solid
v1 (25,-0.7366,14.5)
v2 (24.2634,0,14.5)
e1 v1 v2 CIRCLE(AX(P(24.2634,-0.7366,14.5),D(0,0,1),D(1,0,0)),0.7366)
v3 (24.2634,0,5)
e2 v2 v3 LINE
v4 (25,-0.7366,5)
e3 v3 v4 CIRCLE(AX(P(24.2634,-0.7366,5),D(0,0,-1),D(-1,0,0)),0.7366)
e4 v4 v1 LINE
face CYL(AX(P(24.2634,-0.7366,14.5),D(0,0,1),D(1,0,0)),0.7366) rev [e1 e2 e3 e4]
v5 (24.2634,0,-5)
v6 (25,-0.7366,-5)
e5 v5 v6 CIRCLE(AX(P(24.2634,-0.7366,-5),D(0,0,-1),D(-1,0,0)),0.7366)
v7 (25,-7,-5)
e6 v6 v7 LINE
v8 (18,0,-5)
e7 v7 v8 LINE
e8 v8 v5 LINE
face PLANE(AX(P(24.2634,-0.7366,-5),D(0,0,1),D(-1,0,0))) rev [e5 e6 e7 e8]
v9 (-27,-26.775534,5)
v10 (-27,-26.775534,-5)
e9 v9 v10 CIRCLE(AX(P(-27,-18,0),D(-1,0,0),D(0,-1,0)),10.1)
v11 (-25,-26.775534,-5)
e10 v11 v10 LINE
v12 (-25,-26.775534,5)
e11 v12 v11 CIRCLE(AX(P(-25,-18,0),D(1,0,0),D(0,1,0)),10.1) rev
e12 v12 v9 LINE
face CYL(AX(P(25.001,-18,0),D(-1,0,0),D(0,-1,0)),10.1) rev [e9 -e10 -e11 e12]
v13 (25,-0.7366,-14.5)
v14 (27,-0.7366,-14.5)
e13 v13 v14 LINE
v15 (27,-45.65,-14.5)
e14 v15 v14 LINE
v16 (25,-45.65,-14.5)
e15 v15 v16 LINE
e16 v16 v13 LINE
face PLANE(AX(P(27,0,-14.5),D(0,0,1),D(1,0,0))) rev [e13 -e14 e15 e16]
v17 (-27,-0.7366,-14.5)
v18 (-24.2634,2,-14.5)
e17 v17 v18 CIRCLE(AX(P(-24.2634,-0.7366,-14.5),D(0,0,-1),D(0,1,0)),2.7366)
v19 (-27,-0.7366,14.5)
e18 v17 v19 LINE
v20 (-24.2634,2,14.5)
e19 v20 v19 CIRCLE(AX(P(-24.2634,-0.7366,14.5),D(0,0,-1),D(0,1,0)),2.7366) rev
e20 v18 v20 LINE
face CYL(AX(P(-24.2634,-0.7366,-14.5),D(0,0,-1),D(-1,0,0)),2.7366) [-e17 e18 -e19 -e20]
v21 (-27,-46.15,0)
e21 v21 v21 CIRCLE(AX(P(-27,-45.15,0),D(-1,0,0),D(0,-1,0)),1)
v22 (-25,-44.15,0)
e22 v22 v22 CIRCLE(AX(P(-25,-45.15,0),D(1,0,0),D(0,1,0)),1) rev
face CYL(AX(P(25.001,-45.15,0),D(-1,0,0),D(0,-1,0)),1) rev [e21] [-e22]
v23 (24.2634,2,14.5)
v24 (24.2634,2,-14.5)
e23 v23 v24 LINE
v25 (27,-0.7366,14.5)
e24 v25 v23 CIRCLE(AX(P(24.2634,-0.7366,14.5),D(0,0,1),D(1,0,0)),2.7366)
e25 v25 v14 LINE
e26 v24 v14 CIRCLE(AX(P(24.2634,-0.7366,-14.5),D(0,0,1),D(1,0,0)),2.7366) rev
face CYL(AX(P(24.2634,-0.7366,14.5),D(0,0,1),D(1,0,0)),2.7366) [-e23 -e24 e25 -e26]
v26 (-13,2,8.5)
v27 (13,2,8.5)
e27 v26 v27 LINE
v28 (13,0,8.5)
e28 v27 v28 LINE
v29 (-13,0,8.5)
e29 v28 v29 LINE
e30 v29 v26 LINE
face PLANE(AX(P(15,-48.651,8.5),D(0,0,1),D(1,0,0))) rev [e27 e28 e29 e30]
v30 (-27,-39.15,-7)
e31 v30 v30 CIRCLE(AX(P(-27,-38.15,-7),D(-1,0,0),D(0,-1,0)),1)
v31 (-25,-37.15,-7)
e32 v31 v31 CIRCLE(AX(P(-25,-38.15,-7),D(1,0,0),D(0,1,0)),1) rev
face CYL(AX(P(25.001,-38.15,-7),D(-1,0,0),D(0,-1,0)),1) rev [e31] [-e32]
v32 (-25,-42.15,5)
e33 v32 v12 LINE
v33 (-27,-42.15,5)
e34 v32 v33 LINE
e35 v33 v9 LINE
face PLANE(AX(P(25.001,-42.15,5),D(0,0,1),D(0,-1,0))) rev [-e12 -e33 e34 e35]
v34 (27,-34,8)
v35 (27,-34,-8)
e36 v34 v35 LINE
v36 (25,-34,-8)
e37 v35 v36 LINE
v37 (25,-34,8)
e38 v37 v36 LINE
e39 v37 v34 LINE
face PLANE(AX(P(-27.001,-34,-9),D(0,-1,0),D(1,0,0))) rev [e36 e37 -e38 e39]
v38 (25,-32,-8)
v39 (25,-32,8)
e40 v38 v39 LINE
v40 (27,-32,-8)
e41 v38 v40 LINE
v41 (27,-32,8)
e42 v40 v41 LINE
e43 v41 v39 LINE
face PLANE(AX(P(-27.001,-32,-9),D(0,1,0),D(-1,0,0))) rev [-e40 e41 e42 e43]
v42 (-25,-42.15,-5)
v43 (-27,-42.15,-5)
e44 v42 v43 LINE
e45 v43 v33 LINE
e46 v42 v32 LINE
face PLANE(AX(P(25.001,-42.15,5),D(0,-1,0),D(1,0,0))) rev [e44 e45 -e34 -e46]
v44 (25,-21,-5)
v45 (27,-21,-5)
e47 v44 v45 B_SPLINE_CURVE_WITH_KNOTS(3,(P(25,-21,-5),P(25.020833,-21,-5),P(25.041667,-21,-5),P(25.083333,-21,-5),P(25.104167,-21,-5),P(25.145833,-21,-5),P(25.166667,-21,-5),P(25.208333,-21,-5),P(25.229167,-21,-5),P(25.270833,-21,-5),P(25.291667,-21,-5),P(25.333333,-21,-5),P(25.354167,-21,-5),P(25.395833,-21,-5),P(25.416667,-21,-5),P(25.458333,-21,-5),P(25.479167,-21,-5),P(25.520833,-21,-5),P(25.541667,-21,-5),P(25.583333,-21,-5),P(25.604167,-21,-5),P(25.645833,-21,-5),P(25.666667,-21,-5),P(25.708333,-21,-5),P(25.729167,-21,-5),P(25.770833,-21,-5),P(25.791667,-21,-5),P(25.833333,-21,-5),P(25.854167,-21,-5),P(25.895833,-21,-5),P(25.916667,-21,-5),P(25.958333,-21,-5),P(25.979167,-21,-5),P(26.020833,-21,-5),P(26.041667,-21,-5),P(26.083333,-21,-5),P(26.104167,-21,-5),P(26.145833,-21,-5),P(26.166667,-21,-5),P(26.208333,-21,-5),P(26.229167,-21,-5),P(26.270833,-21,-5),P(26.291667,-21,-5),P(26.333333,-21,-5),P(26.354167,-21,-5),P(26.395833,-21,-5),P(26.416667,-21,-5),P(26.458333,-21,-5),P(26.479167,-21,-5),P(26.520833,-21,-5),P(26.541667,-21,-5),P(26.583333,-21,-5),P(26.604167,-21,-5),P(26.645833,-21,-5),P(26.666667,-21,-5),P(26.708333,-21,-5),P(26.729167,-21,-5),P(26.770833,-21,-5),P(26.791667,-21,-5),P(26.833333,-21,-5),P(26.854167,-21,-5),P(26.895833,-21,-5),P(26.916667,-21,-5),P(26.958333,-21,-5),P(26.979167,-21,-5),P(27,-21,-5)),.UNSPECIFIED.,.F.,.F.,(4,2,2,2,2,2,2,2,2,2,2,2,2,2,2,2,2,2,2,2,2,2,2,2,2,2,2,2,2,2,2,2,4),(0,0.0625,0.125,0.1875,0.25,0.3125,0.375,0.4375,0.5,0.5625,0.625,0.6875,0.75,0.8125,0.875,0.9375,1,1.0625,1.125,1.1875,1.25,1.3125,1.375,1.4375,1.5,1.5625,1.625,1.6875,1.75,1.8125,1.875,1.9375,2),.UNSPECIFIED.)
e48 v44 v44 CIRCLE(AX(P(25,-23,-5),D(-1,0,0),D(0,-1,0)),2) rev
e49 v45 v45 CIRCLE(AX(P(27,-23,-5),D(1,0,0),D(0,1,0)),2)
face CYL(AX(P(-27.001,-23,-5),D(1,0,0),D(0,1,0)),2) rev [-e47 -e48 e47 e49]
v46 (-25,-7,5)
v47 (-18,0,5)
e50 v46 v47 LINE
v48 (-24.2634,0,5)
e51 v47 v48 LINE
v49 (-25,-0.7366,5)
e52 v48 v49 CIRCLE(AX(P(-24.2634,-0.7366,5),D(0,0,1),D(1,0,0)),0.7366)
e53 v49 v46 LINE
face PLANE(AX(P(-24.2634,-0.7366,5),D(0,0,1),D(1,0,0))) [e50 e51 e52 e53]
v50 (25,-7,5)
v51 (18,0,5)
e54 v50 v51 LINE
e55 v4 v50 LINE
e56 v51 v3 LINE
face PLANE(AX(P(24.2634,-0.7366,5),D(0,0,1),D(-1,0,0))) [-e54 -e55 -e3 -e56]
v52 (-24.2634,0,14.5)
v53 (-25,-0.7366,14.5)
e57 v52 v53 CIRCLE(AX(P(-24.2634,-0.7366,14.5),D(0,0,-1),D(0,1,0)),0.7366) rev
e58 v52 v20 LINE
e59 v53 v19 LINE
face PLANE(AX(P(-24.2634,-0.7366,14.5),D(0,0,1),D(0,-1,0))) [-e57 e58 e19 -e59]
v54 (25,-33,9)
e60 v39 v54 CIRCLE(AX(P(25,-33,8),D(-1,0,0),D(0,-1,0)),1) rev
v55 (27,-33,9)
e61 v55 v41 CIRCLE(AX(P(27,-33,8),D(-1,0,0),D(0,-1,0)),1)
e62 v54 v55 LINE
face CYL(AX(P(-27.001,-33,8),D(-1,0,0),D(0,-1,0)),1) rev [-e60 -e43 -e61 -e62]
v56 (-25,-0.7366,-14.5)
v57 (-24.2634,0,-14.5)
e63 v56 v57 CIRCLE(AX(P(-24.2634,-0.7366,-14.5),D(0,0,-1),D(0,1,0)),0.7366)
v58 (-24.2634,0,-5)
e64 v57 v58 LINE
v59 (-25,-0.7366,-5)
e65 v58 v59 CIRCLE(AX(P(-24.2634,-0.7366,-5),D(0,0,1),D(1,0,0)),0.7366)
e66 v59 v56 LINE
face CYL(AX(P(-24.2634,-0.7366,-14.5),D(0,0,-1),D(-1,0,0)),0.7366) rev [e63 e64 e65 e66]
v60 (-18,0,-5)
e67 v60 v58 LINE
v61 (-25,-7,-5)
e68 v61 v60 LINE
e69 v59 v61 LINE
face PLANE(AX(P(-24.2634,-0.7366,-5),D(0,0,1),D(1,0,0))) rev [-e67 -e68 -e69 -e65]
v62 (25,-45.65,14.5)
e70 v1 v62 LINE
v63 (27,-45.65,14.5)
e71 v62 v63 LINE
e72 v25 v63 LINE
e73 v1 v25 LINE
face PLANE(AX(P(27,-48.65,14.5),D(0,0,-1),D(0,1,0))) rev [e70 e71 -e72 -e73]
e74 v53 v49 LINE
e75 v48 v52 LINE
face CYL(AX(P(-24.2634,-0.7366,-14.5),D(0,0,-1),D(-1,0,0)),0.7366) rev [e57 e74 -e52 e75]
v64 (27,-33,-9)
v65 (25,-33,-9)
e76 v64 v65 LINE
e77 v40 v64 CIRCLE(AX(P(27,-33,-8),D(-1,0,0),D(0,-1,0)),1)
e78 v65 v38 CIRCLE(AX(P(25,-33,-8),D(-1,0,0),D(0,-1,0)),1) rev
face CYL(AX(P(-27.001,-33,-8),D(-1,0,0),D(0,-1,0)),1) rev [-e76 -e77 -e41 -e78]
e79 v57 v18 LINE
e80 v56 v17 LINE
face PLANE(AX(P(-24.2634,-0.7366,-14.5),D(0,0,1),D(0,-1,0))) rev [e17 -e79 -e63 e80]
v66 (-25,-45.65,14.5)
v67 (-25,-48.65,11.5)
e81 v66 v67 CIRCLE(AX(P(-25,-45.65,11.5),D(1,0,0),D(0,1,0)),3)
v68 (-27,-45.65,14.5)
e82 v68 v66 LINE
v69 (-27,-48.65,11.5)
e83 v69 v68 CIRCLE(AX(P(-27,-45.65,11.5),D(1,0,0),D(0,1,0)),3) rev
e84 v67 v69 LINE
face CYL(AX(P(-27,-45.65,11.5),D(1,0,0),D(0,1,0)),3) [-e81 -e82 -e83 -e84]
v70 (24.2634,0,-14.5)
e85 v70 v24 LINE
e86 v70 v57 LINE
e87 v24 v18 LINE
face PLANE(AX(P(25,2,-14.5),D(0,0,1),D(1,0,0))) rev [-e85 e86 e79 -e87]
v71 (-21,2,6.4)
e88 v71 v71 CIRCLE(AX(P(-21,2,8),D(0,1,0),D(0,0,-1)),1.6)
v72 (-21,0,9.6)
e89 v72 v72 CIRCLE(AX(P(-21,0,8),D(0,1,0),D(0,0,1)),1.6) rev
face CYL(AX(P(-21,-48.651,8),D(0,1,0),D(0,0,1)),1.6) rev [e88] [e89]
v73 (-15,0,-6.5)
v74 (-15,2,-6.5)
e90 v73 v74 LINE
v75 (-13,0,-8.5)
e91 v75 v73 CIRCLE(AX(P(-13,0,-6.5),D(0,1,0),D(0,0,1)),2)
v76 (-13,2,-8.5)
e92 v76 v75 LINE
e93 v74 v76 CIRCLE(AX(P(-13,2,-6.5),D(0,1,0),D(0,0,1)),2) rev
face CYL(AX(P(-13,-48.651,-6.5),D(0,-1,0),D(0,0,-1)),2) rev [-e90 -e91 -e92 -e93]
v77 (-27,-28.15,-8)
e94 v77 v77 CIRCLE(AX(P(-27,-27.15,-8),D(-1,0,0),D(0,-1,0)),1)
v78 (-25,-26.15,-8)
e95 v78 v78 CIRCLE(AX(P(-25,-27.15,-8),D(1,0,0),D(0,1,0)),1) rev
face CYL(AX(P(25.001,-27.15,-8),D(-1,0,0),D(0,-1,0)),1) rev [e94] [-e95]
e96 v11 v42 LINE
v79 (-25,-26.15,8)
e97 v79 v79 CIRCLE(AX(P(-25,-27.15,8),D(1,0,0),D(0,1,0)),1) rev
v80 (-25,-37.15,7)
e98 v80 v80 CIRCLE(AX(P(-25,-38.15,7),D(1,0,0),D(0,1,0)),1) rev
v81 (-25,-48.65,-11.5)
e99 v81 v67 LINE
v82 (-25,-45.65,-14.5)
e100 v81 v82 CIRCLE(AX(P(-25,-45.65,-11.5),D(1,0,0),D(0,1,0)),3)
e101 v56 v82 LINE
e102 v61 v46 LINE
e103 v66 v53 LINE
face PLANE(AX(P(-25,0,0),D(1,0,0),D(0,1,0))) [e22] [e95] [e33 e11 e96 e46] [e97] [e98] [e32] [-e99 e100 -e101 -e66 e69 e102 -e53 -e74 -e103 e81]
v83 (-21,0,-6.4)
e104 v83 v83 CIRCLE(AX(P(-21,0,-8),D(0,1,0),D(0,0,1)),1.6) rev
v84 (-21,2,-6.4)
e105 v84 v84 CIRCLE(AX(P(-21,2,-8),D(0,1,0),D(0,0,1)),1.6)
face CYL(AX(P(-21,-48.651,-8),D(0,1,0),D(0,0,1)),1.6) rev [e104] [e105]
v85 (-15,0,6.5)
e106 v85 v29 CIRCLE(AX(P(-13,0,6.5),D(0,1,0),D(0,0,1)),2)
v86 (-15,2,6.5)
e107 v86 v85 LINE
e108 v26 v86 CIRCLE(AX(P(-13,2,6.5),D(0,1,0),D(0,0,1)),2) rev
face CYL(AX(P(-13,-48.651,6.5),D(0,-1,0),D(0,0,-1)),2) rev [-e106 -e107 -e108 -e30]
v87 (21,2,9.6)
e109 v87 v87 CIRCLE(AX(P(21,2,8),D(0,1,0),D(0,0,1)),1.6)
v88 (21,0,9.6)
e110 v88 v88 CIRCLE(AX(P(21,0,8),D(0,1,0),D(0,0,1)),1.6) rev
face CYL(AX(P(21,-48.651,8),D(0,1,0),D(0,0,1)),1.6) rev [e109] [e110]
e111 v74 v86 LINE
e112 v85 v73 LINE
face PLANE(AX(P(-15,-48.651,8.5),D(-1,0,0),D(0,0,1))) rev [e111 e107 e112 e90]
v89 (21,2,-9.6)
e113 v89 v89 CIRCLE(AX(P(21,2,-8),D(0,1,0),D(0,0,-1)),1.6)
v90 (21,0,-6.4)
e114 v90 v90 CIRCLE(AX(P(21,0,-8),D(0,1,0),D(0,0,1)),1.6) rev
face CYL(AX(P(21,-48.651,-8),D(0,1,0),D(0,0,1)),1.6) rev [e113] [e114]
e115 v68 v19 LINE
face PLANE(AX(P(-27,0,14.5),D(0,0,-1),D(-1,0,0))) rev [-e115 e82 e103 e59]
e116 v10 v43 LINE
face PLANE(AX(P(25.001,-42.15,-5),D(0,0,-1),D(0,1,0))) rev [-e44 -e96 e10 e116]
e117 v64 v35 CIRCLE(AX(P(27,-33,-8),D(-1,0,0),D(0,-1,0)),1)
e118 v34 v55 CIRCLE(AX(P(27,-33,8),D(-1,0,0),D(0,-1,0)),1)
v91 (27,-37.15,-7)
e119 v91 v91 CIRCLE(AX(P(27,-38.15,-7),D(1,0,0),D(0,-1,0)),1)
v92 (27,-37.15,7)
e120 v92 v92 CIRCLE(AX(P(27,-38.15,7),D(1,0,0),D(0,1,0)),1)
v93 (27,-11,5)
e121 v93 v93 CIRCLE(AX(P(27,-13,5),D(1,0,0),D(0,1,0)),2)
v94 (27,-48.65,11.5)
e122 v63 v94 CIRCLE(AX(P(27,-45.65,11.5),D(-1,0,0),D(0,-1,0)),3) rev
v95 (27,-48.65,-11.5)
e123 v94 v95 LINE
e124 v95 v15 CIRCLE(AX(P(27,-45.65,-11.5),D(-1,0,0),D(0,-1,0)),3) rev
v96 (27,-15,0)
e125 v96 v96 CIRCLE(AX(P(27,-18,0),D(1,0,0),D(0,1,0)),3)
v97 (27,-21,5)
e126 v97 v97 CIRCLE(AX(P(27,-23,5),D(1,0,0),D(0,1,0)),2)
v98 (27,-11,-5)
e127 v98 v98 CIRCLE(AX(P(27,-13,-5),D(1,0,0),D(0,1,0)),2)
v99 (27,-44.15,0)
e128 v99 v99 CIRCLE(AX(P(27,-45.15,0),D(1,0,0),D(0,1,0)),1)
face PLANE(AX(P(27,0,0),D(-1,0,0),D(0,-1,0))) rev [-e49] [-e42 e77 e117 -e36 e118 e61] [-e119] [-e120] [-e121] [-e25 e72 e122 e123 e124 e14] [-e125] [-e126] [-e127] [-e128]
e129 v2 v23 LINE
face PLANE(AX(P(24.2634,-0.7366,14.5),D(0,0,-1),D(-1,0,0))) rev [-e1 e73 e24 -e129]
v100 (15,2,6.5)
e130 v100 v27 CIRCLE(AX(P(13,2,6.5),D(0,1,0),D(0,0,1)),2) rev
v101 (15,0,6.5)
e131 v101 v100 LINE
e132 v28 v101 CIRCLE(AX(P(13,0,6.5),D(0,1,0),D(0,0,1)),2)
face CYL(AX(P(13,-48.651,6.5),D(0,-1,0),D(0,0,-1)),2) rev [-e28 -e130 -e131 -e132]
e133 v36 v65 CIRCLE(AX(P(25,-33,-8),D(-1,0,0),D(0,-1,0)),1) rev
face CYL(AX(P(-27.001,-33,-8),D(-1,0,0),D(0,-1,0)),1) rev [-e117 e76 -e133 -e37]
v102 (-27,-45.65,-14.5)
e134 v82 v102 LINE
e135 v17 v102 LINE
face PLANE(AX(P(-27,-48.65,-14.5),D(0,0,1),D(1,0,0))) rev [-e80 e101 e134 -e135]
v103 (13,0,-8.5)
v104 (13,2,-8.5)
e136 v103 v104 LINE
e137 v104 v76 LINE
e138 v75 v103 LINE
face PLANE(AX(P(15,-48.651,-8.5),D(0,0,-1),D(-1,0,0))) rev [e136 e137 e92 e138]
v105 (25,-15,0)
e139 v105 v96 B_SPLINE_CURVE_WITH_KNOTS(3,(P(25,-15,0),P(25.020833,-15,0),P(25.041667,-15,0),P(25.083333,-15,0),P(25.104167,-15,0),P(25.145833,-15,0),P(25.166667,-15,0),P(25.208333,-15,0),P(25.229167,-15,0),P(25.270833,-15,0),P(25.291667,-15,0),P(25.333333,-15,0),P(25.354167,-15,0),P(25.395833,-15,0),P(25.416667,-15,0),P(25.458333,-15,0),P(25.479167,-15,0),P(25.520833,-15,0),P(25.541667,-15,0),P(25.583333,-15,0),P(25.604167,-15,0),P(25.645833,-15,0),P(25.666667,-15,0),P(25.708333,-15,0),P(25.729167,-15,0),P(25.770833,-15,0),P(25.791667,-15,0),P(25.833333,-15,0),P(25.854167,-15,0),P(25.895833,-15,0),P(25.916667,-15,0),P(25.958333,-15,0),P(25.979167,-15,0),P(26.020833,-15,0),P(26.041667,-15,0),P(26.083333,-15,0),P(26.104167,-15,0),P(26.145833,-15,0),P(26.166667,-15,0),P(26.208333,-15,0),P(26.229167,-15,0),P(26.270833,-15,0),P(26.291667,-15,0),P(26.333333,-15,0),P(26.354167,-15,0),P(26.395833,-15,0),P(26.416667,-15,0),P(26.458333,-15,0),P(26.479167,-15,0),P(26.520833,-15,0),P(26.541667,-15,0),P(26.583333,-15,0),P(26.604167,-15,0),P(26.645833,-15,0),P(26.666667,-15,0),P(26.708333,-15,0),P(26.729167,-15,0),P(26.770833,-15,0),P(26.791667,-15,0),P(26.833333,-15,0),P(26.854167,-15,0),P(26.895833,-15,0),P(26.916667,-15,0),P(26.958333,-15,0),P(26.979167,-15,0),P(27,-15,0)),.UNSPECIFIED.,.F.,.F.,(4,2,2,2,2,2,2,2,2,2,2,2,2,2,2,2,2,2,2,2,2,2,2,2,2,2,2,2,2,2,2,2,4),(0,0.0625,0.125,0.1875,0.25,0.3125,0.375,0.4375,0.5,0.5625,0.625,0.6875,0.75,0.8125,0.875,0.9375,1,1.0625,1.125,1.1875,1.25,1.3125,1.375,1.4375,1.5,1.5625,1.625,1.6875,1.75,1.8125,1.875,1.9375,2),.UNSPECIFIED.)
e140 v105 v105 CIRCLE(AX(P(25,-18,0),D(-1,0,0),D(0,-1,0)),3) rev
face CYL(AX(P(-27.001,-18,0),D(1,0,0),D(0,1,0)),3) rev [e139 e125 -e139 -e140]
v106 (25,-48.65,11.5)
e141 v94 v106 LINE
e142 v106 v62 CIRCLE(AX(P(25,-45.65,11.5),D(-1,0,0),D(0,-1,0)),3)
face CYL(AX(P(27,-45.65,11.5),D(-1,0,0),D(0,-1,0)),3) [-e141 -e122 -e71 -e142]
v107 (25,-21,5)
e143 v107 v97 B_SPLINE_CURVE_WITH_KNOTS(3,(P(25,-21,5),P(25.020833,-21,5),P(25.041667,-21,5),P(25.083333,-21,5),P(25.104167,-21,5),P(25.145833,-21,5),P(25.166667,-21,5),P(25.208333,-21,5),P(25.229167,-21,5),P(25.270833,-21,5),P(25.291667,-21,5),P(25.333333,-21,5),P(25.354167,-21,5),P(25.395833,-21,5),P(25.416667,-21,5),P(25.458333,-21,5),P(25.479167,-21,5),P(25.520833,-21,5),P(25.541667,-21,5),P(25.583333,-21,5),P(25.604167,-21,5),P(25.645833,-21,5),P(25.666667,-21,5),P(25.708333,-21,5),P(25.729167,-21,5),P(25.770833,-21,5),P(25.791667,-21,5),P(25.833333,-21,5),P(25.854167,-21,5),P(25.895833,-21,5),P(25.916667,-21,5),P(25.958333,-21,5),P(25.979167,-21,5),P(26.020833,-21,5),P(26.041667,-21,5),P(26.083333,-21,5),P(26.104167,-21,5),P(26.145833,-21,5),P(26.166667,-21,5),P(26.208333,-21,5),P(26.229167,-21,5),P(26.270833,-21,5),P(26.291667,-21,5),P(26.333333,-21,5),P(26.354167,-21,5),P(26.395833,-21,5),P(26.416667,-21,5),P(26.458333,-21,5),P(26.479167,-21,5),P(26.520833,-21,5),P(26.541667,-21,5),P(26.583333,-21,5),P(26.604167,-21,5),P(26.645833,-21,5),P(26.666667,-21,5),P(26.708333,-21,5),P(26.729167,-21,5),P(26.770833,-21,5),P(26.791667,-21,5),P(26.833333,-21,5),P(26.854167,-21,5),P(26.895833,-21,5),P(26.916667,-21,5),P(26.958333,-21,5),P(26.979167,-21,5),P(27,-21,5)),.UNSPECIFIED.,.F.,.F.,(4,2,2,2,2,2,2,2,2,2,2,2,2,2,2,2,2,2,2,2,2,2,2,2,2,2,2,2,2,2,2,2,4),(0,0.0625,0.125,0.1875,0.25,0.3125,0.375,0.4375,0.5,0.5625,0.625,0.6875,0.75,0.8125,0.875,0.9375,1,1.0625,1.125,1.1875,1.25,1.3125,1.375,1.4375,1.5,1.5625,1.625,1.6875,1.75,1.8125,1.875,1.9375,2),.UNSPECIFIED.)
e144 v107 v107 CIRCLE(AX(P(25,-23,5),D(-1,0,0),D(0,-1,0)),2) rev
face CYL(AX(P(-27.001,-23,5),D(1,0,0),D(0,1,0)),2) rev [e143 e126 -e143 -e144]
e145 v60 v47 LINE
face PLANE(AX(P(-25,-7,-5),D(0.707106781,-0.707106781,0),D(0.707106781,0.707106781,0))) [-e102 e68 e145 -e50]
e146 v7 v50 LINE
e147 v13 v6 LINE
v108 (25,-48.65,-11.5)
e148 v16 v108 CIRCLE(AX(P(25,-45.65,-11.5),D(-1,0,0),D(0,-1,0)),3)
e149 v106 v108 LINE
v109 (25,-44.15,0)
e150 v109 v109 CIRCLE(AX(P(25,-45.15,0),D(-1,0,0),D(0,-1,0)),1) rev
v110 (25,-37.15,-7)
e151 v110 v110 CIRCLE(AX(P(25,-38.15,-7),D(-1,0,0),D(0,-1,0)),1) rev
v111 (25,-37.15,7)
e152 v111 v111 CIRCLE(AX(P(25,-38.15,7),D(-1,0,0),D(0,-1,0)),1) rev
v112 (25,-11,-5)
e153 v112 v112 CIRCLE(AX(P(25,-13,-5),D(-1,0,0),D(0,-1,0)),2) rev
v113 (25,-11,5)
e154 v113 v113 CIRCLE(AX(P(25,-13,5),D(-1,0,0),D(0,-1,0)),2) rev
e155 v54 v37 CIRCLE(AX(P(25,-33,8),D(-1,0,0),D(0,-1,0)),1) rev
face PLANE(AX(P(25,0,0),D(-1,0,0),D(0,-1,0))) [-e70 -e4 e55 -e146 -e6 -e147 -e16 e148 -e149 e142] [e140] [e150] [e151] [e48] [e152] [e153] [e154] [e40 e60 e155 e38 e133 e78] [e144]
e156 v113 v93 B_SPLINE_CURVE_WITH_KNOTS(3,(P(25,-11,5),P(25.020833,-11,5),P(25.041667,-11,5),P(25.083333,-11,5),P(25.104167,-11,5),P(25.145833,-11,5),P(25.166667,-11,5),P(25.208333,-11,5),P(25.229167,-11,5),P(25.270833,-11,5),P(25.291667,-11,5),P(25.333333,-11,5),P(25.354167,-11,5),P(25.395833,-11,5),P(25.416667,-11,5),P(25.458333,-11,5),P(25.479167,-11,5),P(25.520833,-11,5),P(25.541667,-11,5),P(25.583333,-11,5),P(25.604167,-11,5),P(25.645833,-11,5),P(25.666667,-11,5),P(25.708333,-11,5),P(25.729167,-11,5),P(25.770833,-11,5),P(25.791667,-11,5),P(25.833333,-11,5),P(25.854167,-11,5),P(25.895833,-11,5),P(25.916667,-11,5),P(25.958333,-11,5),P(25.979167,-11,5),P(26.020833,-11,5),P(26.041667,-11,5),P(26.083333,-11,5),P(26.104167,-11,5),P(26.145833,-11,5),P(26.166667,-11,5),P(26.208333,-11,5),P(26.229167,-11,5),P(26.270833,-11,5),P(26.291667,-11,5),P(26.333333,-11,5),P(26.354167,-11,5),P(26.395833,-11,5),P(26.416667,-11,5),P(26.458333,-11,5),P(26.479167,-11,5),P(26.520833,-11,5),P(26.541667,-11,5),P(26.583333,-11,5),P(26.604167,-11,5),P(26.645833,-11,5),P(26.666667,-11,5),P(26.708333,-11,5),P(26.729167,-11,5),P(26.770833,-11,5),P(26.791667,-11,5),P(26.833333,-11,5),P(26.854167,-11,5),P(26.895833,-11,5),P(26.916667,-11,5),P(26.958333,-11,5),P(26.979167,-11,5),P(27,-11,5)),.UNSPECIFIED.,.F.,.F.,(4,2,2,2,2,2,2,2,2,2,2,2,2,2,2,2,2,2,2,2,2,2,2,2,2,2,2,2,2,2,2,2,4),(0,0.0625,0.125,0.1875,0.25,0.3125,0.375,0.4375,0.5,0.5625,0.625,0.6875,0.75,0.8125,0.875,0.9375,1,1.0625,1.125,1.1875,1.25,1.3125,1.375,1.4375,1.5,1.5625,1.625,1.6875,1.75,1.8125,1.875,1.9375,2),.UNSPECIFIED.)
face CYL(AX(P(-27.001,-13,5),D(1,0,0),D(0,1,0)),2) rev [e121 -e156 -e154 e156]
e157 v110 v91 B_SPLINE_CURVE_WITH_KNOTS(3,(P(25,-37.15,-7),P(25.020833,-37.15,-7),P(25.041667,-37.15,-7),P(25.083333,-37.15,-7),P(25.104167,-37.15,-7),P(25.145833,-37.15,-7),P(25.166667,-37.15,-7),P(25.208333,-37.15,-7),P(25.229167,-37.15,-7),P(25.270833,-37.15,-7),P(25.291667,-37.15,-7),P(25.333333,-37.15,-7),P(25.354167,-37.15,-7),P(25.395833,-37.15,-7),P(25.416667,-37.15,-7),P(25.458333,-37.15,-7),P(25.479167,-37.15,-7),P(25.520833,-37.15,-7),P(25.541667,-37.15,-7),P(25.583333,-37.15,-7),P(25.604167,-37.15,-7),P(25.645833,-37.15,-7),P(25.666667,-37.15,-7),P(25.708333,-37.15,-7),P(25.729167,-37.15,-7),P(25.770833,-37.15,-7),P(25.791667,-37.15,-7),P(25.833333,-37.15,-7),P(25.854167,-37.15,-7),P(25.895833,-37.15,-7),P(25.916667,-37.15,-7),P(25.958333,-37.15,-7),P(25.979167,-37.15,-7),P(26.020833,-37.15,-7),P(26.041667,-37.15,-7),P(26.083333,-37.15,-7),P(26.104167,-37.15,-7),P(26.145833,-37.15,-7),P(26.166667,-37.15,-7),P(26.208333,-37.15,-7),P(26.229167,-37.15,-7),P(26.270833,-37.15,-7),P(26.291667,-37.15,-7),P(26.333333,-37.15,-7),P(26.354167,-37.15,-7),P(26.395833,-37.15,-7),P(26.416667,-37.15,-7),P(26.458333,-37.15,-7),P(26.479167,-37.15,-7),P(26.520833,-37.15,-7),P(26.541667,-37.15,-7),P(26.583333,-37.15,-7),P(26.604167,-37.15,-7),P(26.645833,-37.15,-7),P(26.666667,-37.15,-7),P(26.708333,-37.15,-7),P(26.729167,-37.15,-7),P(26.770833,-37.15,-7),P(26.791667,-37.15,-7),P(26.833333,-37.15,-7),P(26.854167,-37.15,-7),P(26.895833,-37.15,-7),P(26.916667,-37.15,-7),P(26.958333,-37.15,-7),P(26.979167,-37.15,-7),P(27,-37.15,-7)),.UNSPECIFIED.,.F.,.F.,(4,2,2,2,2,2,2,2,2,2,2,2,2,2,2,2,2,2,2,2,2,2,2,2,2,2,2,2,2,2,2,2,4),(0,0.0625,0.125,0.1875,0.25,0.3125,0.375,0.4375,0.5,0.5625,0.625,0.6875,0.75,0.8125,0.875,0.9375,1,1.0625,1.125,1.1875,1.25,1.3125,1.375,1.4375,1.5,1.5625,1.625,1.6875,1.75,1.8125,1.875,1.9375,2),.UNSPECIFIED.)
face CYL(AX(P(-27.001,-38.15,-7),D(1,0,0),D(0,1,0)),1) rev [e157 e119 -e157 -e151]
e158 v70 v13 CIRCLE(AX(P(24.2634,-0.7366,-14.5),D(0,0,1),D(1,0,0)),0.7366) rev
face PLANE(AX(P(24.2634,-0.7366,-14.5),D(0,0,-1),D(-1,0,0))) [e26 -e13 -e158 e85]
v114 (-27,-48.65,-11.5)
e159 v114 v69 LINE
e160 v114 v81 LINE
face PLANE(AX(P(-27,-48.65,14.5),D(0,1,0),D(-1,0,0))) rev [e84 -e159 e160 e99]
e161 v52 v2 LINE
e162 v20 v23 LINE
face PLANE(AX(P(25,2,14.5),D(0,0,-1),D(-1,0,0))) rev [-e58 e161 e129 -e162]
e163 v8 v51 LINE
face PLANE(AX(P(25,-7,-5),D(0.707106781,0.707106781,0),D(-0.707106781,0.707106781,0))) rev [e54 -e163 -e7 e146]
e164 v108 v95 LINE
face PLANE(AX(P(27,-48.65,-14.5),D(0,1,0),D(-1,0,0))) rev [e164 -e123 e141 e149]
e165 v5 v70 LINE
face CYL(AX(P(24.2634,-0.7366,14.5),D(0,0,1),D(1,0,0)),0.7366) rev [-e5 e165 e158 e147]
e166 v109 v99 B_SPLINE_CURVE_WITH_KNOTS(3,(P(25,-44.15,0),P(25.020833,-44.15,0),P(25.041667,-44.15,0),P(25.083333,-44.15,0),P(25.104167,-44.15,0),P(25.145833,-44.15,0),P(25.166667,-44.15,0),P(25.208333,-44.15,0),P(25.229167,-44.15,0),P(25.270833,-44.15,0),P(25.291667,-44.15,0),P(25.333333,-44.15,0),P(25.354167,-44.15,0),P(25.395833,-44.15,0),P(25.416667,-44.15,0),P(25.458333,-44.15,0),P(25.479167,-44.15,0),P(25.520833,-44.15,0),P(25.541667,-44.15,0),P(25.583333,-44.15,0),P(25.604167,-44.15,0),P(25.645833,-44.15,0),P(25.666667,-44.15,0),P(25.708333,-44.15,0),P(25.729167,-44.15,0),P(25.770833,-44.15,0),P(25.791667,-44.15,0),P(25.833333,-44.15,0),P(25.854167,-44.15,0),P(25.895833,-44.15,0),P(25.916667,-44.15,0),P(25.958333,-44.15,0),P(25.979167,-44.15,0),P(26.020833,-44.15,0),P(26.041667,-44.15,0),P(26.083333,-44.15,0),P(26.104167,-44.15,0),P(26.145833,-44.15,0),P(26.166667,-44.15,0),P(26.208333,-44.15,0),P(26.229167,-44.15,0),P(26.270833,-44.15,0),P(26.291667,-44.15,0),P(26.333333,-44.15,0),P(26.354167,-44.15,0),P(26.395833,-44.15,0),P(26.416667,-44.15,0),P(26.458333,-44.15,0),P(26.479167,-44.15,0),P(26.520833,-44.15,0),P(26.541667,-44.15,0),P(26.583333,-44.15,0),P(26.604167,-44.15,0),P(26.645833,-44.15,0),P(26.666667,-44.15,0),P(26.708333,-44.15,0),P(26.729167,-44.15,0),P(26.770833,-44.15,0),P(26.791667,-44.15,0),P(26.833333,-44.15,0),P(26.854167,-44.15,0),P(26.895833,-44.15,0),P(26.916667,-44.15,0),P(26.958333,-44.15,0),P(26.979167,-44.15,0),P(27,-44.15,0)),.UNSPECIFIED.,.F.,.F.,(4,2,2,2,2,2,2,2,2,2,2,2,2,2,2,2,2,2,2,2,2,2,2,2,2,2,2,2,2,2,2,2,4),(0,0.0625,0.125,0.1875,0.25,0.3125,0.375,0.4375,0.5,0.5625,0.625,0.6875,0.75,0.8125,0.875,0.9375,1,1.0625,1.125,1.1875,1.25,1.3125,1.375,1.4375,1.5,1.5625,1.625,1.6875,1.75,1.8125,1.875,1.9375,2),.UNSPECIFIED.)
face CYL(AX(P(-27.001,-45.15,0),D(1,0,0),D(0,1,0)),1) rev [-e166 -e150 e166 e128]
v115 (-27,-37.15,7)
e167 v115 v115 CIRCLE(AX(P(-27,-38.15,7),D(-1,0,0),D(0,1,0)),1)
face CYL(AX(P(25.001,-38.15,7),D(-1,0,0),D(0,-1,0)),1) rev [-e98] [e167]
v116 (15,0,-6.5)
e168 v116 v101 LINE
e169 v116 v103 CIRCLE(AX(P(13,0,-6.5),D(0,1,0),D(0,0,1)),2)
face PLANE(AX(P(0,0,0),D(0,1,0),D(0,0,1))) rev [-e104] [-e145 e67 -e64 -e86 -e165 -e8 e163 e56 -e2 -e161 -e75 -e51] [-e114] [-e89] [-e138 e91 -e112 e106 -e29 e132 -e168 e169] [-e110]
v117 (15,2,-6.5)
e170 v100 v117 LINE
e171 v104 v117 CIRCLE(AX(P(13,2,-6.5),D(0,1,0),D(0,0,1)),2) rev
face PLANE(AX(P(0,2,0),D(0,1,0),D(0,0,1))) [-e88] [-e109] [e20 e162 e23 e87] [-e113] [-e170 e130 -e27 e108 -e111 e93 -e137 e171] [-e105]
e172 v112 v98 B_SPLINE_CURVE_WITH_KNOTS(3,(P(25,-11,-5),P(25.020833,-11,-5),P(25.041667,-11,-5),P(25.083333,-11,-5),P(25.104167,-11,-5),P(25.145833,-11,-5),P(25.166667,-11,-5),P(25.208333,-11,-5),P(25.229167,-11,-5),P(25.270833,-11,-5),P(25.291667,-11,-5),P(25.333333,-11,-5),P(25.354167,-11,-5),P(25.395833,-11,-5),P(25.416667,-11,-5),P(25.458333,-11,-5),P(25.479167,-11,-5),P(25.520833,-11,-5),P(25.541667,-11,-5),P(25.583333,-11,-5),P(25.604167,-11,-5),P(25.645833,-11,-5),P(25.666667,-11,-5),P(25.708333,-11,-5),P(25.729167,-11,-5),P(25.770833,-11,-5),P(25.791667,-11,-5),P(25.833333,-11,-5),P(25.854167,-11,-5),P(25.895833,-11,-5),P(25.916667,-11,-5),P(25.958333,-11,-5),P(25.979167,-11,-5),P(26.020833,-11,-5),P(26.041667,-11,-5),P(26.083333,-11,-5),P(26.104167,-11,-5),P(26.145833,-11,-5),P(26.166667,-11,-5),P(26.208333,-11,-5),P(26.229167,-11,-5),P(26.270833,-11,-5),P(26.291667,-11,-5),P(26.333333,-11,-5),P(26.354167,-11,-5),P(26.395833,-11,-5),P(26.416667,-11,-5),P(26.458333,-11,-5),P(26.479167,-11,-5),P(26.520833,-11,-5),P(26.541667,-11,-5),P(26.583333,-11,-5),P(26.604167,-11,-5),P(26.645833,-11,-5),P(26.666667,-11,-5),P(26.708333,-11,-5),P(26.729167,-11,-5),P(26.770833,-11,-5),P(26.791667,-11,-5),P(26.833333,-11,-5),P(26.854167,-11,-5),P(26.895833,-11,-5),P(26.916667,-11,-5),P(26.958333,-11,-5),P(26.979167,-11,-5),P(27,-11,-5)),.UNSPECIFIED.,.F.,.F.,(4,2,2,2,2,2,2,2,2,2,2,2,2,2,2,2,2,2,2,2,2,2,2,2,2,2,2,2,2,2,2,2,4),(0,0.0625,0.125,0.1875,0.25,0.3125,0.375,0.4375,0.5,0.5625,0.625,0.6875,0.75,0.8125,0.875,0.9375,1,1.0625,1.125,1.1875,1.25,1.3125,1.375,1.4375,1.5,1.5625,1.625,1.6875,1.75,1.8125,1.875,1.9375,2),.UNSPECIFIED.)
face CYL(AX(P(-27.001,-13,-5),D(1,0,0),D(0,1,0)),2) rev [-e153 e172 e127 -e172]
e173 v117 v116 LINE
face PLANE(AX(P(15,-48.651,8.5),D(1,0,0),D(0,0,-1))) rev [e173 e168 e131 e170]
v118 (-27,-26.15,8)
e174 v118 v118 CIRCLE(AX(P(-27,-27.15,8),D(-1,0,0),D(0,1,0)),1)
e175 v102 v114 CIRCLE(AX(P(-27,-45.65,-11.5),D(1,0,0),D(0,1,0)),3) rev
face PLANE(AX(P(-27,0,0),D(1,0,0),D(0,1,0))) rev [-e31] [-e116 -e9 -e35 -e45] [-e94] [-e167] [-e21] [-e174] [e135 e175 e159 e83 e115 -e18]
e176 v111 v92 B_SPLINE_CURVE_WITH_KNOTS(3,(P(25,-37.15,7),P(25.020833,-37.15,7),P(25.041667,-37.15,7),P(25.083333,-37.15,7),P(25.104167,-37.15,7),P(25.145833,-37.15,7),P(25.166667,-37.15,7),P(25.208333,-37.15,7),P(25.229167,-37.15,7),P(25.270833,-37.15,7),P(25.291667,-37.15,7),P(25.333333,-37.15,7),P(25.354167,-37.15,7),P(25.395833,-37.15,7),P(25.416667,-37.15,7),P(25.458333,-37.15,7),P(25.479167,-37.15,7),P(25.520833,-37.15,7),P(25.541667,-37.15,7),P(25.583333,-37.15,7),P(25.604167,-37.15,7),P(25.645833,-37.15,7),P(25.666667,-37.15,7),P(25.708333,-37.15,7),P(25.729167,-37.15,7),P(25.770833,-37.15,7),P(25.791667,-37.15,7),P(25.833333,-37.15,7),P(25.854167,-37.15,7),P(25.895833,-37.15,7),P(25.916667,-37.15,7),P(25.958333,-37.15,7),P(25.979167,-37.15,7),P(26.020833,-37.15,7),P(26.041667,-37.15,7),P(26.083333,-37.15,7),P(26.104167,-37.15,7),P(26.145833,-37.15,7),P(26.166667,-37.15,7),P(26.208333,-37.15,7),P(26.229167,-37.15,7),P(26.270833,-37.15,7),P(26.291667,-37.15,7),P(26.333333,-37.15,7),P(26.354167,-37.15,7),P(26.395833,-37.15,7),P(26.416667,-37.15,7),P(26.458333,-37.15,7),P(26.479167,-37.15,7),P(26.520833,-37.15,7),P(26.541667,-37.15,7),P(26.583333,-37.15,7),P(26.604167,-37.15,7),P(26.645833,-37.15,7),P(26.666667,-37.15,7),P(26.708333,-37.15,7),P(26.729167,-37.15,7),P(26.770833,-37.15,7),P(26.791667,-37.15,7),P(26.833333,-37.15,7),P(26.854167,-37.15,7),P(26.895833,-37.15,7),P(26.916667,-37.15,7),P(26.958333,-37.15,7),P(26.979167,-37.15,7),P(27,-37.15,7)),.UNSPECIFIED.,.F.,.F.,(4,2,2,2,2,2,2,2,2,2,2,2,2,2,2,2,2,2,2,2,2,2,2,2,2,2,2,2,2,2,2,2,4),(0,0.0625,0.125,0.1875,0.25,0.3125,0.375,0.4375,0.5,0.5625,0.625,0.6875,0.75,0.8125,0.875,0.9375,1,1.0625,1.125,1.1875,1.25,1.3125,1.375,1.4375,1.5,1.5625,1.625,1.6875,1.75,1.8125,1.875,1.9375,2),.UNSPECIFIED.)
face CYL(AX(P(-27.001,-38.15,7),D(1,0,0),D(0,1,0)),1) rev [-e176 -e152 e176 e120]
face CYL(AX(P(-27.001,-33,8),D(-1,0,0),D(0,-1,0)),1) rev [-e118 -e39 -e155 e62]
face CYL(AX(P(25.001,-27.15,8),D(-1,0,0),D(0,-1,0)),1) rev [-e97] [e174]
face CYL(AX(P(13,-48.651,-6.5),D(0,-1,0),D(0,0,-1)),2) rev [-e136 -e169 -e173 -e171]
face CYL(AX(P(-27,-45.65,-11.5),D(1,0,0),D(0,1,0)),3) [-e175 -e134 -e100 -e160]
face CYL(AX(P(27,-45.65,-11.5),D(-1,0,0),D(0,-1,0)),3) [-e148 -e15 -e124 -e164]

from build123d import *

# Parameters (mm, degrees)
SKETCH_1_W                       = 50
SKETCH_1_H                       = 29
SM_BASE_FLANGE_1_DEPTH           = 2
SM_EDGE_FLANGE_1_STRIP_W         = 9.4732
SM_EDGE_FLANGE_1_STRIP_H         = 2
SM_EDGE_FLANGE_1_STRIP_CUT_DEPTH = 29
SM_EDGE_FLANGE_1_DEPTH           = 29
CUT_EXTRUDE_1_REACH              = 74.671
SKETCH_9_R                       = 1
SM_EDGE_FLANGE_2_STRIP_W         = 9.4732
SM_EDGE_FLANGE_2_STRIP_H         = 2
SM_EDGE_FLANGE_2_STRIP_CUT_DEPTH = 29
SM_EDGE_FLANGE_2_DEPTH           = 29
CUT_EXTRUDE_2_REACH              = 76.115
SKETCH_13_R                      = 3
SKETCH_13_R_2                    = 2
SKETCH_13_R_3                    = 1
SKETCH_13_W                      = 18
SKETCH_13_H                      = 2
FILLET_1_R                       = 3
CUT_EXTRUDE_3_REACH              = 61.2
SKETCH_14_R                      = 1.6
SKETCH_14_W                      = 30
SKETCH_14_H                      = 17
FILLET_2_R                       = 2
EXTRUDE_1_DEPTH                  = 5
FILLET_3_R                       = 1


# Sheet-metal steps are written as plain solids
with BuildPart() as part:
    # Sketch 1 → 基体-法兰1 (new body)
    with BuildSketch(Plane(origin=(0, 0, 0), x_dir=(1, 0, 0), z_dir=(0, 1, 0))):
        Rectangle(SKETCH_1_W, SKETCH_1_H)
    extrude(amount=SM_BASE_FLANGE_1_DEPTH)

    # 边线-法兰1 strip (across the edge) → 边线-法兰1 strip cut (cut)
    with BuildSketch(Plane(origin=(-25, 0, 14.5), x_dir=(1, 0, 0), z_dir=(0, 0, -1))):
        with Locations((-4, -1)):
            Rectangle(SM_EDGE_FLANGE_1_STRIP_W, SM_EDGE_FLANGE_1_STRIP_H)
    extrude(amount=SM_EDGE_FLANGE_1_STRIP_CUT_DEPTH, mode=Mode.SUBTRACT)

    # 边线-法兰1 section (across the edge) → 边线-法兰1 (add)
    with BuildSketch(Plane(origin=(-25, 0, 14.5), x_dir=(1, 0, 0), z_dir=(0, 0, -1))):
        with BuildLine():
            Line((-2, 0.7366), (-2, 48.65))
            Line((-2, 48.65), (0, 48.65))
            Line((0, 48.65), (0, 0.7366))
            ThreePointArc((0, 0.7366), (0.215745145, 0.215745145), (0.7366, 0))
            Line((0.7366, 0), (0.7366, -2))
            ThreePointArc((0.7366, -2), (-1.198468417, -1.198468417), (-2, 0.7366))
        make_face()
    extrude(amount=SM_EDGE_FLANGE_1_DEPTH)

    # 草图9 → 切除-拉伸1 (cut, up to next)
    with BuildSketch(Plane.ZY.offset(27), mode=Mode.PRIVATE) as cut_extrude_1_sk1:
        with Locations(Location((-8, -27.15, 0), (0, 0, 270))):
            Circle(SKETCH_9_R)
    cut_extrude_1_tool1 = extrude(cut_extrude_1_sk1.sketch, amount=-CUT_EXTRUDE_1_REACH, mode=Mode.PRIVATE) & part.part
    # 草图9 → 切除-拉伸1 (cut, up to next)
    with BuildSketch(Plane.ZY.offset(27), mode=Mode.PRIVATE) as cut_extrude_1_sk2:
        with Locations(Location((-7, -38.15, 0), (0, 0, 270))):
            Circle(SKETCH_9_R)
    cut_extrude_1_tool2 = extrude(cut_extrude_1_sk2.sketch, amount=-CUT_EXTRUDE_1_REACH, mode=Mode.PRIVATE) & part.part
    # 草图9 → 切除-拉伸1 (cut, up to next)
    with BuildSketch(Plane.ZY.offset(27), mode=Mode.PRIVATE) as cut_extrude_1_sk3:
        with Locations(Location((0, -45.15, 0), (0, 0, 270))):
            Circle(SKETCH_9_R)
    cut_extrude_1_tool3 = extrude(cut_extrude_1_sk3.sketch, amount=-CUT_EXTRUDE_1_REACH, mode=Mode.PRIVATE) & part.part
    # 草图9 → 切除-拉伸1 (cut, up to next)
    with BuildSketch(Plane.ZY.offset(27), mode=Mode.PRIVATE) as cut_extrude_1_sk4:
        with Locations(Location((7, -38.15, 0), (0, 0, 90))):
            Circle(SKETCH_9_R)
    cut_extrude_1_tool4 = extrude(cut_extrude_1_sk4.sketch, amount=-CUT_EXTRUDE_1_REACH, mode=Mode.PRIVATE) & part.part
    # 草图9 → 切除-拉伸1 (cut, up to next)
    with BuildSketch(Plane.ZY.offset(27), mode=Mode.PRIVATE) as cut_extrude_1_sk5:
        with Locations(Location((8, -27.15, 0), (0, 0, 90))):
            Circle(SKETCH_9_R)
    cut_extrude_1_tool5 = extrude(cut_extrude_1_sk5.sketch, amount=-CUT_EXTRUDE_1_REACH, mode=Mode.PRIVATE) & part.part
    # 草图9 → 切除-拉伸1 (cut, up to next)
    with BuildSketch(Plane.ZY.offset(27), mode=Mode.PRIVATE) as cut_extrude_1_sk6:
        with BuildLine():
            Line((-5, -42.15), (-5, -26.775534172))
            ThreePointArc((-5, -26.775534172), (0, -7.9), (5, -26.775534172))
            Line((5, -26.775534172), (5, -42.15))
            Line((5, -42.15), (-5, -42.15))
        make_face()
    cut_extrude_1_tool6 = extrude(cut_extrude_1_sk6.sketch, amount=-CUT_EXTRUDE_1_REACH, mode=Mode.PRIVATE) & part.part
    add(cut_extrude_1_tool1.solids().sort_by_distance((-27, -27.15, -8))[0], mode=Mode.SUBTRACT)
    add(cut_extrude_1_tool2.solids().sort_by_distance((-27, -38.15, -7))[0], mode=Mode.SUBTRACT)
    add(cut_extrude_1_tool3.solids().sort_by_distance((-27, -45.15, 0))[0], mode=Mode.SUBTRACT)
    add(cut_extrude_1_tool4.solids().sort_by_distance((-27, -38.15, 7))[0], mode=Mode.SUBTRACT)
    add(cut_extrude_1_tool5.solids().sort_by_distance((-27, -27.15, 8))[0], mode=Mode.SUBTRACT)
    add(cut_extrude_1_tool6.solids().sort_by_distance((-27, -23.260924, 0))[0], mode=Mode.SUBTRACT)

    # 边线-法兰2 strip (across the edge) → 边线-法兰2 strip cut (cut)
    with BuildSketch(Plane(origin=(25, 0, -14.5), x_dir=(-1, 0, 0), z_dir=(0, 0, 1))):
        with Locations((-4, -1)):
            Rectangle(SM_EDGE_FLANGE_2_STRIP_W, SM_EDGE_FLANGE_2_STRIP_H)
    extrude(amount=SM_EDGE_FLANGE_2_STRIP_CUT_DEPTH, mode=Mode.SUBTRACT)

    # 边线-法兰2 section (across the edge) → 边线-法兰2 (add)
    with BuildSketch(Plane(origin=(25, 0, -14.5), x_dir=(-1, 0, 0), z_dir=(0, 0, 1))):
        with BuildLine():
            Line((-2, 0.7366), (-2, 48.65))
            Line((-2, 48.65), (0, 48.65))
            Line((0, 48.65), (0, 0.7366))
            ThreePointArc((0, 0.7366), (0.215745145, 0.215745145), (0.7366, 0))
            Line((0.7366, 0), (0.7366, -2))
            ThreePointArc((0.7366, -2), (-1.198468417, -1.198468417), (-2, 0.7366))
        make_face()
    extrude(amount=SM_EDGE_FLANGE_2_DEPTH)

    # 草图13 → 切除-拉伸2 (cut, up to next)
    with BuildSketch(Plane(origin=(27, 0, 0), x_dir=(0, 0, -1), z_dir=(1, 0, 0)), mode=Mode.PRIVATE) as cut_extrude_2_sk1:
        with Locations(Location((0, -18, 0), (0, 0, 90))):
            Circle(SKETCH_13_R)
    cut_extrude_2_tool1 = extrude(cut_extrude_2_sk1.sketch, amount=-CUT_EXTRUDE_2_REACH, mode=Mode.PRIVATE) & part.part
    # 草图13 → 切除-拉伸2 (cut, up to next)
    with BuildSketch(Plane(origin=(27, 0, 0), x_dir=(0, 0, -1), z_dir=(1, 0, 0)), mode=Mode.PRIVATE) as cut_extrude_2_sk2:
        with Locations(Location((-5, -13, 0), (0, 0, 90))):
            Circle(SKETCH_13_R_2)
    cut_extrude_2_tool2 = extrude(cut_extrude_2_sk2.sketch, amount=-CUT_EXTRUDE_2_REACH, mode=Mode.PRIVATE) & part.part
    # 草图13 → 切除-拉伸2 (cut, up to next)
    with BuildSketch(Plane(origin=(27, 0, 0), x_dir=(0, 0, -1), z_dir=(1, 0, 0)), mode=Mode.PRIVATE) as cut_extrude_2_sk3:
        with Locations(Location((5, -13, 0), (0, 0, 90))):
            Circle(SKETCH_13_R_2)
    cut_extrude_2_tool3 = extrude(cut_extrude_2_sk3.sketch, amount=-CUT_EXTRUDE_2_REACH, mode=Mode.PRIVATE) & part.part
    # 草图13 → 切除-拉伸2 (cut, up to next)
    with BuildSketch(Plane(origin=(27, 0, 0), x_dir=(0, 0, -1), z_dir=(1, 0, 0)), mode=Mode.PRIVATE) as cut_extrude_2_sk4:
        with Locations(Location((5, -23, 0), (0, 0, 90))):
            Circle(SKETCH_13_R_2)
    cut_extrude_2_tool4 = extrude(cut_extrude_2_sk4.sketch, amount=-CUT_EXTRUDE_2_REACH, mode=Mode.PRIVATE) & part.part
    # 草图13 → 切除-拉伸2 (cut, up to next)
    with BuildSketch(Plane(origin=(27, 0, 0), x_dir=(0, 0, -1), z_dir=(1, 0, 0)), mode=Mode.PRIVATE) as cut_extrude_2_sk5:
        with Locations(Location((-5, -23, 0), (0, 0, 90))):
            Circle(SKETCH_13_R_2)
    cut_extrude_2_tool5 = extrude(cut_extrude_2_sk5.sketch, amount=-CUT_EXTRUDE_2_REACH, mode=Mode.PRIVATE) & part.part
    # 草图13 → 切除-拉伸2 (cut, up to next)
    with BuildSketch(Plane(origin=(27, 0, 0), x_dir=(0, 0, -1), z_dir=(1, 0, 0)), mode=Mode.PRIVATE) as cut_extrude_2_sk6:
        with Locations(Location((0, -45.15, 0), (0, 0, 270))):
            Circle(SKETCH_13_R_3)
    cut_extrude_2_tool6 = extrude(cut_extrude_2_sk6.sketch, amount=-CUT_EXTRUDE_2_REACH, mode=Mode.PRIVATE) & part.part
    # 草图13 → 切除-拉伸2 (cut, up to next)
    with BuildSketch(Plane(origin=(27, 0, 0), x_dir=(0, 0, -1), z_dir=(1, 0, 0)), mode=Mode.PRIVATE) as cut_extrude_2_sk7:
        with Locations(Location((-7, -38.15, 0), (0, 0, 90))):
            Circle(SKETCH_13_R_3)
    cut_extrude_2_tool7 = extrude(cut_extrude_2_sk7.sketch, amount=-CUT_EXTRUDE_2_REACH, mode=Mode.PRIVATE) & part.part
    # 草图13 → 切除-拉伸2 (cut, up to next)
    with BuildSketch(Plane(origin=(27, 0, 0), x_dir=(0, 0, -1), z_dir=(1, 0, 0)), mode=Mode.PRIVATE) as cut_extrude_2_sk8:
        with Locations(Location((7, -38.15, 0), (0, 0, 270))):
            Circle(SKETCH_13_R_3)
    cut_extrude_2_tool8 = extrude(cut_extrude_2_sk8.sketch, amount=-CUT_EXTRUDE_2_REACH, mode=Mode.PRIVATE) & part.part
    # 草图13 → 切除-拉伸2 (cut, up to next)
    with BuildSketch(Plane(origin=(27, 0, 0), x_dir=(0, 0, -1), z_dir=(1, 0, 0)), mode=Mode.PRIVATE) as cut_extrude_2_sk9:
        with Locations((0, -33)):
            Rectangle(SKETCH_13_W, SKETCH_13_H)
    cut_extrude_2_tool9 = extrude(cut_extrude_2_sk9.sketch, amount=-CUT_EXTRUDE_2_REACH, mode=Mode.PRIVATE) & part.part
    add(cut_extrude_2_tool1.solids().sort_by_distance((27, -18, 0))[0], mode=Mode.SUBTRACT)
    add(cut_extrude_2_tool2.solids().sort_by_distance((27, -13, 5))[0], mode=Mode.SUBTRACT)
    add(cut_extrude_2_tool3.solids().sort_by_distance((27, -13, -5))[0], mode=Mode.SUBTRACT)
    add(cut_extrude_2_tool4.solids().sort_by_distance((27, -23, -5))[0], mode=Mode.SUBTRACT)
    add(cut_extrude_2_tool5.solids().sort_by_distance((27, -23, 5))[0], mode=Mode.SUBTRACT)
    add(cut_extrude_2_tool6.solids().sort_by_distance((27, -45.15, 0))[0], mode=Mode.SUBTRACT)
    add(cut_extrude_2_tool7.solids().sort_by_distance((27, -38.15, 7))[0], mode=Mode.SUBTRACT)
    add(cut_extrude_2_tool8.solids().sort_by_distance((27, -38.15, -7))[0], mode=Mode.SUBTRACT)
    add(cut_extrude_2_tool9.solids().sort_by_distance((27, -33, 0))[0], mode=Mode.SUBTRACT)

    # 圆角1
    fillet_1_edges = [part.edges().sort_by_distance(p)[0] for p in [
        (26, -48.65, -14.5),
        (26, -48.65, 14.5),
        (-26, -48.65, 14.5),
        (-26, -48.65, -14.5),
    ]]
    fillet(fillet_1_edges, radius=FILLET_1_R)

    # 草图14 → 切除-拉伸3 (cut, up to next)
    with BuildSketch(Plane(origin=(0, 2, 0), x_dir=(1, 0, 0), z_dir=(0, 1, 0)), mode=Mode.PRIVATE) as cut_extrude_3_sk1:
        with Locations(Location((-21, 8, 0), (0, 0, 270))):
            Circle(SKETCH_14_R)
    cut_extrude_3_tool1 = extrude(cut_extrude_3_sk1.sketch, amount=-CUT_EXTRUDE_3_REACH, mode=Mode.PRIVATE) & part.part
    # 草图14 → 切除-拉伸3 (cut, up to next)
    with BuildSketch(Plane(origin=(0, 2, 0), x_dir=(1, 0, 0), z_dir=(0, 1, 0)), mode=Mode.PRIVATE) as cut_extrude_3_sk2:
        with Locations(Location((-21, -8, 0), (0, 0, 270))):
            Circle(SKETCH_14_R)
    cut_extrude_3_tool2 = extrude(cut_extrude_3_sk2.sketch, amount=-CUT_EXTRUDE_3_REACH, mode=Mode.PRIVATE) & part.part
    # 草图14 → 切除-拉伸3 (cut, up to next)
    with BuildSketch(Plane(origin=(0, 2, 0), x_dir=(1, 0, 0), z_dir=(0, 1, 0)), mode=Mode.PRIVATE) as cut_extrude_3_sk3:
        with Locations(Location((21, -8, 0), (0, 0, 270))):
            Circle(SKETCH_14_R)
    cut_extrude_3_tool3 = extrude(cut_extrude_3_sk3.sketch, amount=-CUT_EXTRUDE_3_REACH, mode=Mode.PRIVATE) & part.part
    # 草图14 → 切除-拉伸3 (cut, up to next)
    with BuildSketch(Plane(origin=(0, 2, 0), x_dir=(1, 0, 0), z_dir=(0, 1, 0)), mode=Mode.PRIVATE) as cut_extrude_3_sk4:
        with Locations(Location((21, 8, 0), (0, 0, 270))):
            Circle(SKETCH_14_R)
    cut_extrude_3_tool4 = extrude(cut_extrude_3_sk4.sketch, amount=-CUT_EXTRUDE_3_REACH, mode=Mode.PRIVATE) & part.part
    # 草图14 → 切除-拉伸3 (cut, up to next)
    with BuildSketch(Plane(origin=(0, 2, 0), x_dir=(1, 0, 0), z_dir=(0, 1, 0)), mode=Mode.PRIVATE) as cut_extrude_3_sk5:
        Rectangle(SKETCH_14_W, SKETCH_14_H)
    cut_extrude_3_tool5 = extrude(cut_extrude_3_sk5.sketch, amount=-CUT_EXTRUDE_3_REACH, mode=Mode.PRIVATE) & part.part
    add(cut_extrude_3_tool1.solids().sort_by_distance((-21, 2, -8))[0], mode=Mode.SUBTRACT)
    add(cut_extrude_3_tool2.solids().sort_by_distance((-21, 2, 8))[0], mode=Mode.SUBTRACT)
    add(cut_extrude_3_tool3.solids().sort_by_distance((21, 2, 8))[0], mode=Mode.SUBTRACT)
    add(cut_extrude_3_tool4.solids().sort_by_distance((21, 2, -8))[0], mode=Mode.SUBTRACT)
    add(cut_extrude_3_tool5.solids().sort_by_distance((0, 2, 0))[0], mode=Mode.SUBTRACT)

    # 圆角2
    fillet_2_edges = [part.edges().sort_by_distance(p)[0] for p in [
        (-15, 1, 8.5),
        (-15, 1, -8.5),
        (15, 1, -8.5),
        (15, 1, 8.5),
    ]]
    fillet(fillet_2_edges, radius=FILLET_2_R)

    # 草图15 → 凸台-拉伸1 (add, symmetric)
    with BuildSketch(Plane.XY):
        with BuildLine():
            Line((-25, -7), (-18, 0))
            Line((-18, 0), (-24.2634, 0))
            ThreePointArc((-24.2634, 0), (-24.784254855, -0.215745145), (-25, -0.7366))
            Line((-25, -0.7366), (-25, -7))
        make_face()
    extrude_1 = extrude(amount=EXTRUDE_1_DEPTH, both=True)

    # 圆角3
    fillet_3_edges = [part.edges().sort_by_distance(p)[0] for p in [
        (26, -34, -9),
        (26, -32, -9),
        (26, -34, 9),
        (26, -32, 9),
    ]]
    fillet(fillet_3_edges, radius=FILLET_3_R - 0.0001)  # a hair under: the kernel refuses the full size

    # 镜向1: 凸台-拉伸1 across plane
    add(extrude_1.mirror(Plane(origin=(0, 0, 0), x_dir=(0, 0, 1), z_dir=(1, 0, 0))))


solid = part.part
